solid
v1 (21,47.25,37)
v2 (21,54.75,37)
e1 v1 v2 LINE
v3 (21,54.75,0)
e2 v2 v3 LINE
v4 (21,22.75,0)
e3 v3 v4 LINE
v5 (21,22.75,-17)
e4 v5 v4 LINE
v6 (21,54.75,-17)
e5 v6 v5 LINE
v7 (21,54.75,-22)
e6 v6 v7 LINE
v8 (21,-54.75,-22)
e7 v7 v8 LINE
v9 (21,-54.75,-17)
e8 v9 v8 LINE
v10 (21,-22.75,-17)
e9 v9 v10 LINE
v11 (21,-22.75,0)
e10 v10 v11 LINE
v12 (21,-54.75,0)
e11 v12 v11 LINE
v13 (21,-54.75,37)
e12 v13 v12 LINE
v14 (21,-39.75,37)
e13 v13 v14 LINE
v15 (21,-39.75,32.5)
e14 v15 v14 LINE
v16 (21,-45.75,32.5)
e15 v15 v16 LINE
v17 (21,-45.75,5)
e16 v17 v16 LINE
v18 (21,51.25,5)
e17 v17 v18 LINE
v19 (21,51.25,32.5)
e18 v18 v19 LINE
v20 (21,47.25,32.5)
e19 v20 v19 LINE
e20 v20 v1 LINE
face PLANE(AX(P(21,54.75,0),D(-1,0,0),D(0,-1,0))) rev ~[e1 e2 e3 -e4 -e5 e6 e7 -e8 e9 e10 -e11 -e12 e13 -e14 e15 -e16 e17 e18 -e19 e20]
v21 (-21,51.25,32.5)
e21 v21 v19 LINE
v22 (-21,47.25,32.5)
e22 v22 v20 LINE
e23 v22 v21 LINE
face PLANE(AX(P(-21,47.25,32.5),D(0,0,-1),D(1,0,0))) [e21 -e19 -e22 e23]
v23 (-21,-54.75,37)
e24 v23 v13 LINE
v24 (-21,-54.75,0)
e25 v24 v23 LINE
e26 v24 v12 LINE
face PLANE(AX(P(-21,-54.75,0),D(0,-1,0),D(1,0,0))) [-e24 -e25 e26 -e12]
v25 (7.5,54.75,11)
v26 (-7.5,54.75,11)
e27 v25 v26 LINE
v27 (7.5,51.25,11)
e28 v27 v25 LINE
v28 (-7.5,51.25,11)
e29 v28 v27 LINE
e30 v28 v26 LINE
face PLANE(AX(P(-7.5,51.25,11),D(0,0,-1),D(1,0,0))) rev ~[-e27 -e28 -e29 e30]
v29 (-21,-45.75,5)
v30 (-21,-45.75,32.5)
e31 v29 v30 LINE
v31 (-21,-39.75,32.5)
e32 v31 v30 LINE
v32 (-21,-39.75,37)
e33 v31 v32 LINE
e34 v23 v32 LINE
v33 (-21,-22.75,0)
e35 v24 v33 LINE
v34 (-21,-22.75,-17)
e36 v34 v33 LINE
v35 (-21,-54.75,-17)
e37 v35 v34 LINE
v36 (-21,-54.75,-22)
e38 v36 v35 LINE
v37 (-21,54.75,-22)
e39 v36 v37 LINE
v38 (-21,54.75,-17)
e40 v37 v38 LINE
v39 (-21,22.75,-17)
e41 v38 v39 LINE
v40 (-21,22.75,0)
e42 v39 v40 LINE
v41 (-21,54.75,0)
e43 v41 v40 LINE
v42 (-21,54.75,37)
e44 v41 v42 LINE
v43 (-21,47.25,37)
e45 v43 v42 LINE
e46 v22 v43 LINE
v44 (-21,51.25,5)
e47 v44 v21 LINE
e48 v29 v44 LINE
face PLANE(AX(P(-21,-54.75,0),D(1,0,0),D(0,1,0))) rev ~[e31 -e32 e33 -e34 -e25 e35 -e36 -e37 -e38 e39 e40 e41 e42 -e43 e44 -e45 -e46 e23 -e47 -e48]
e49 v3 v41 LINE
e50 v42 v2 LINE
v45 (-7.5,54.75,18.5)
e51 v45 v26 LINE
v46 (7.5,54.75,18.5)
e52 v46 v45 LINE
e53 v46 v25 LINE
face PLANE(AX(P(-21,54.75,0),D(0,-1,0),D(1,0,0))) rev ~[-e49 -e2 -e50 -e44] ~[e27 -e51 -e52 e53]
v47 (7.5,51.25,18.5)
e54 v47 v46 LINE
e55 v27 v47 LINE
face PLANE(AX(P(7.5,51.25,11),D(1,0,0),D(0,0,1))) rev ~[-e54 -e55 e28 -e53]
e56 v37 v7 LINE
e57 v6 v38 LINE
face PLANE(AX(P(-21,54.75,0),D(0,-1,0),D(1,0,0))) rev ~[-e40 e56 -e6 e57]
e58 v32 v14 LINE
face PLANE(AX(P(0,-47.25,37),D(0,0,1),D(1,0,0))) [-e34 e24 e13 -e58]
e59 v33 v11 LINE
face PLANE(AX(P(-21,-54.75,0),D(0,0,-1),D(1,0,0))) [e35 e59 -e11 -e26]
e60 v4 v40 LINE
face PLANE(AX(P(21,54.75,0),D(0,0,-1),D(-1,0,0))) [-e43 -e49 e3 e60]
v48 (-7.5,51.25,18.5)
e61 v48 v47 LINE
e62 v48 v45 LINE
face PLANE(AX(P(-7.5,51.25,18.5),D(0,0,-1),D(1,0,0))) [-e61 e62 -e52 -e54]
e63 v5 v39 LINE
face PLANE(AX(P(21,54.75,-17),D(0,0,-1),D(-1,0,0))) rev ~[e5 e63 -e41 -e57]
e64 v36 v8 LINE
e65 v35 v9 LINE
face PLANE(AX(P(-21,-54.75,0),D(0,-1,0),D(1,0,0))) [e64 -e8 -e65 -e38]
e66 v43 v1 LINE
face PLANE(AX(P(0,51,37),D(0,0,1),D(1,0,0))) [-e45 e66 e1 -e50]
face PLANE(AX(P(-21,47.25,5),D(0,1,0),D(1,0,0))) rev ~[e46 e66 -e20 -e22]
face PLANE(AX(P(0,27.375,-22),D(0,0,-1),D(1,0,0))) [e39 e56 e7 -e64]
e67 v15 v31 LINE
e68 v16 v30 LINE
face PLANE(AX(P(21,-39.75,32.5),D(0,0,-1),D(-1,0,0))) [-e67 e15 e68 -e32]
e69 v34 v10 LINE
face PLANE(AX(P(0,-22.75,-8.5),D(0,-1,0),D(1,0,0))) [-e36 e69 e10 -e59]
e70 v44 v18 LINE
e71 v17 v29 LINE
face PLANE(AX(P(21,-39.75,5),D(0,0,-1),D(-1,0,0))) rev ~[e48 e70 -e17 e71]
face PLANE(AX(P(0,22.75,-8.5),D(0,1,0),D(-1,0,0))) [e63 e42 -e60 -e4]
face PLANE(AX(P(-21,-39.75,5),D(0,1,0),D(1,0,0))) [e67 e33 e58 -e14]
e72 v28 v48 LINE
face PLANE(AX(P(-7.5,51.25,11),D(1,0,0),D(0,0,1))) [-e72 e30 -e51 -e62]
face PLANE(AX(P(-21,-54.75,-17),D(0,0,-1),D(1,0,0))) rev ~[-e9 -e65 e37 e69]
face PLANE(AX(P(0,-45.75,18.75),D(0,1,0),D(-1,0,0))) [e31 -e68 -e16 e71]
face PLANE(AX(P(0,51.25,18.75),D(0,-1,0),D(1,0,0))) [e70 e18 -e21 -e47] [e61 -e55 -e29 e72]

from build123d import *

# Parameters (mm, degrees)
F0_W      = 42
F0_H      = 109.5
F1_DEPTH  = 5
F2_W      = 42
F2_H      = 7.5
F2_H_2    = 15
F3_DEPTH  = 32
F4_W      = 42
F4_H      = 27.5
F5_DEPTH  = 4
F6_W      = 42
F6_H      = 27.5
F7_DEPTH  = 6
F8_W      = 15
F8_H      = 7.5
F9_DEPTH  = 3.501
F10_W     = 42
F10_H     = 54.75
F11_DEPTH = 22
F12_W     = 42
F12_H     = 17
F13_DEPTH = 32
F14_W     = 42
F14_H     = 17
F15_DEPTH = 32


# Not quite as in the source:
# - a feature names something its author has since deleted; it is built from what else it names


with BuildPart() as f1:
    # F0 (on Top) → F1 (new body)
    with BuildSketch(Plane.XY):
        Rectangle(F0_W, F0_H)
    extrude(amount=F1_DEPTH)

    # F2 (on face) → F3 (join)
    with BuildSketch(Plane.XY.offset(5)):
        with Locations((0, 51)):
            Rectangle(F2_W, F2_H)
        with Locations((0, -47.25)):
            Rectangle(F2_W, F2_H_2)
    extrude(amount=F3_DEPTH)

    # F4 (on face) → F5 (cut)
    with BuildSketch(Plane.XZ.offset(-47.25)):
        with Locations((0, 18.75)):
            Rectangle(F4_W, F4_H)
    extrude(amount=-F5_DEPTH, mode=Mode.SUBTRACT)

    # F6 (on face) → F7 (cut)
    with BuildSketch(Plane(origin=(0, -39.75, 0), x_dir=(-1, 0, 0), z_dir=(0, 1, 0))):
        with Locations((0, 18.75)):
            Rectangle(F6_W, F6_H)
    extrude(amount=-F7_DEPTH, mode=Mode.SUBTRACT)

    # F8 (on face) → F9 (cut, through all)
    with BuildSketch(Plane.XZ.offset(-51.25)):
        with Locations((0, 14.75)):
            Rectangle(F8_W, F8_H)
    extrude(amount=-F9_DEPTH, mode=Mode.SUBTRACT)

    # F10 (on face) → F11 (join)
    with BuildSketch(Plane(origin=(0, 0, 0), x_dir=(1, 0, 0), z_dir=(0, 0, -1))):
        with Locations((0, -27.375)):
            Rectangle(F10_W, F10_H)
        with Locations((0, 27.375)):
            Rectangle(F10_W, F10_H)
    extrude(amount=F11_DEPTH)

    # F12 (on face) → F13 (cut)
    with BuildSketch(Plane(origin=(0, 54.75, 0), x_dir=(-1, 0, 0), z_dir=(0, 1, 0))):
        with Locations((0, -8.5)):
            Rectangle(F12_W, F12_H)
    extrude(amount=-F13_DEPTH, mode=Mode.SUBTRACT)

    # F14 (on face) → F15 (cut)
    with BuildSketch(Plane.XZ.offset(54.75)):
        with Locations((0, -8.5)):
            Rectangle(F14_W, F14_H)
    extrude(amount=-F15_DEPTH, mode=Mode.SUBTRACT)


solid = f1.part
